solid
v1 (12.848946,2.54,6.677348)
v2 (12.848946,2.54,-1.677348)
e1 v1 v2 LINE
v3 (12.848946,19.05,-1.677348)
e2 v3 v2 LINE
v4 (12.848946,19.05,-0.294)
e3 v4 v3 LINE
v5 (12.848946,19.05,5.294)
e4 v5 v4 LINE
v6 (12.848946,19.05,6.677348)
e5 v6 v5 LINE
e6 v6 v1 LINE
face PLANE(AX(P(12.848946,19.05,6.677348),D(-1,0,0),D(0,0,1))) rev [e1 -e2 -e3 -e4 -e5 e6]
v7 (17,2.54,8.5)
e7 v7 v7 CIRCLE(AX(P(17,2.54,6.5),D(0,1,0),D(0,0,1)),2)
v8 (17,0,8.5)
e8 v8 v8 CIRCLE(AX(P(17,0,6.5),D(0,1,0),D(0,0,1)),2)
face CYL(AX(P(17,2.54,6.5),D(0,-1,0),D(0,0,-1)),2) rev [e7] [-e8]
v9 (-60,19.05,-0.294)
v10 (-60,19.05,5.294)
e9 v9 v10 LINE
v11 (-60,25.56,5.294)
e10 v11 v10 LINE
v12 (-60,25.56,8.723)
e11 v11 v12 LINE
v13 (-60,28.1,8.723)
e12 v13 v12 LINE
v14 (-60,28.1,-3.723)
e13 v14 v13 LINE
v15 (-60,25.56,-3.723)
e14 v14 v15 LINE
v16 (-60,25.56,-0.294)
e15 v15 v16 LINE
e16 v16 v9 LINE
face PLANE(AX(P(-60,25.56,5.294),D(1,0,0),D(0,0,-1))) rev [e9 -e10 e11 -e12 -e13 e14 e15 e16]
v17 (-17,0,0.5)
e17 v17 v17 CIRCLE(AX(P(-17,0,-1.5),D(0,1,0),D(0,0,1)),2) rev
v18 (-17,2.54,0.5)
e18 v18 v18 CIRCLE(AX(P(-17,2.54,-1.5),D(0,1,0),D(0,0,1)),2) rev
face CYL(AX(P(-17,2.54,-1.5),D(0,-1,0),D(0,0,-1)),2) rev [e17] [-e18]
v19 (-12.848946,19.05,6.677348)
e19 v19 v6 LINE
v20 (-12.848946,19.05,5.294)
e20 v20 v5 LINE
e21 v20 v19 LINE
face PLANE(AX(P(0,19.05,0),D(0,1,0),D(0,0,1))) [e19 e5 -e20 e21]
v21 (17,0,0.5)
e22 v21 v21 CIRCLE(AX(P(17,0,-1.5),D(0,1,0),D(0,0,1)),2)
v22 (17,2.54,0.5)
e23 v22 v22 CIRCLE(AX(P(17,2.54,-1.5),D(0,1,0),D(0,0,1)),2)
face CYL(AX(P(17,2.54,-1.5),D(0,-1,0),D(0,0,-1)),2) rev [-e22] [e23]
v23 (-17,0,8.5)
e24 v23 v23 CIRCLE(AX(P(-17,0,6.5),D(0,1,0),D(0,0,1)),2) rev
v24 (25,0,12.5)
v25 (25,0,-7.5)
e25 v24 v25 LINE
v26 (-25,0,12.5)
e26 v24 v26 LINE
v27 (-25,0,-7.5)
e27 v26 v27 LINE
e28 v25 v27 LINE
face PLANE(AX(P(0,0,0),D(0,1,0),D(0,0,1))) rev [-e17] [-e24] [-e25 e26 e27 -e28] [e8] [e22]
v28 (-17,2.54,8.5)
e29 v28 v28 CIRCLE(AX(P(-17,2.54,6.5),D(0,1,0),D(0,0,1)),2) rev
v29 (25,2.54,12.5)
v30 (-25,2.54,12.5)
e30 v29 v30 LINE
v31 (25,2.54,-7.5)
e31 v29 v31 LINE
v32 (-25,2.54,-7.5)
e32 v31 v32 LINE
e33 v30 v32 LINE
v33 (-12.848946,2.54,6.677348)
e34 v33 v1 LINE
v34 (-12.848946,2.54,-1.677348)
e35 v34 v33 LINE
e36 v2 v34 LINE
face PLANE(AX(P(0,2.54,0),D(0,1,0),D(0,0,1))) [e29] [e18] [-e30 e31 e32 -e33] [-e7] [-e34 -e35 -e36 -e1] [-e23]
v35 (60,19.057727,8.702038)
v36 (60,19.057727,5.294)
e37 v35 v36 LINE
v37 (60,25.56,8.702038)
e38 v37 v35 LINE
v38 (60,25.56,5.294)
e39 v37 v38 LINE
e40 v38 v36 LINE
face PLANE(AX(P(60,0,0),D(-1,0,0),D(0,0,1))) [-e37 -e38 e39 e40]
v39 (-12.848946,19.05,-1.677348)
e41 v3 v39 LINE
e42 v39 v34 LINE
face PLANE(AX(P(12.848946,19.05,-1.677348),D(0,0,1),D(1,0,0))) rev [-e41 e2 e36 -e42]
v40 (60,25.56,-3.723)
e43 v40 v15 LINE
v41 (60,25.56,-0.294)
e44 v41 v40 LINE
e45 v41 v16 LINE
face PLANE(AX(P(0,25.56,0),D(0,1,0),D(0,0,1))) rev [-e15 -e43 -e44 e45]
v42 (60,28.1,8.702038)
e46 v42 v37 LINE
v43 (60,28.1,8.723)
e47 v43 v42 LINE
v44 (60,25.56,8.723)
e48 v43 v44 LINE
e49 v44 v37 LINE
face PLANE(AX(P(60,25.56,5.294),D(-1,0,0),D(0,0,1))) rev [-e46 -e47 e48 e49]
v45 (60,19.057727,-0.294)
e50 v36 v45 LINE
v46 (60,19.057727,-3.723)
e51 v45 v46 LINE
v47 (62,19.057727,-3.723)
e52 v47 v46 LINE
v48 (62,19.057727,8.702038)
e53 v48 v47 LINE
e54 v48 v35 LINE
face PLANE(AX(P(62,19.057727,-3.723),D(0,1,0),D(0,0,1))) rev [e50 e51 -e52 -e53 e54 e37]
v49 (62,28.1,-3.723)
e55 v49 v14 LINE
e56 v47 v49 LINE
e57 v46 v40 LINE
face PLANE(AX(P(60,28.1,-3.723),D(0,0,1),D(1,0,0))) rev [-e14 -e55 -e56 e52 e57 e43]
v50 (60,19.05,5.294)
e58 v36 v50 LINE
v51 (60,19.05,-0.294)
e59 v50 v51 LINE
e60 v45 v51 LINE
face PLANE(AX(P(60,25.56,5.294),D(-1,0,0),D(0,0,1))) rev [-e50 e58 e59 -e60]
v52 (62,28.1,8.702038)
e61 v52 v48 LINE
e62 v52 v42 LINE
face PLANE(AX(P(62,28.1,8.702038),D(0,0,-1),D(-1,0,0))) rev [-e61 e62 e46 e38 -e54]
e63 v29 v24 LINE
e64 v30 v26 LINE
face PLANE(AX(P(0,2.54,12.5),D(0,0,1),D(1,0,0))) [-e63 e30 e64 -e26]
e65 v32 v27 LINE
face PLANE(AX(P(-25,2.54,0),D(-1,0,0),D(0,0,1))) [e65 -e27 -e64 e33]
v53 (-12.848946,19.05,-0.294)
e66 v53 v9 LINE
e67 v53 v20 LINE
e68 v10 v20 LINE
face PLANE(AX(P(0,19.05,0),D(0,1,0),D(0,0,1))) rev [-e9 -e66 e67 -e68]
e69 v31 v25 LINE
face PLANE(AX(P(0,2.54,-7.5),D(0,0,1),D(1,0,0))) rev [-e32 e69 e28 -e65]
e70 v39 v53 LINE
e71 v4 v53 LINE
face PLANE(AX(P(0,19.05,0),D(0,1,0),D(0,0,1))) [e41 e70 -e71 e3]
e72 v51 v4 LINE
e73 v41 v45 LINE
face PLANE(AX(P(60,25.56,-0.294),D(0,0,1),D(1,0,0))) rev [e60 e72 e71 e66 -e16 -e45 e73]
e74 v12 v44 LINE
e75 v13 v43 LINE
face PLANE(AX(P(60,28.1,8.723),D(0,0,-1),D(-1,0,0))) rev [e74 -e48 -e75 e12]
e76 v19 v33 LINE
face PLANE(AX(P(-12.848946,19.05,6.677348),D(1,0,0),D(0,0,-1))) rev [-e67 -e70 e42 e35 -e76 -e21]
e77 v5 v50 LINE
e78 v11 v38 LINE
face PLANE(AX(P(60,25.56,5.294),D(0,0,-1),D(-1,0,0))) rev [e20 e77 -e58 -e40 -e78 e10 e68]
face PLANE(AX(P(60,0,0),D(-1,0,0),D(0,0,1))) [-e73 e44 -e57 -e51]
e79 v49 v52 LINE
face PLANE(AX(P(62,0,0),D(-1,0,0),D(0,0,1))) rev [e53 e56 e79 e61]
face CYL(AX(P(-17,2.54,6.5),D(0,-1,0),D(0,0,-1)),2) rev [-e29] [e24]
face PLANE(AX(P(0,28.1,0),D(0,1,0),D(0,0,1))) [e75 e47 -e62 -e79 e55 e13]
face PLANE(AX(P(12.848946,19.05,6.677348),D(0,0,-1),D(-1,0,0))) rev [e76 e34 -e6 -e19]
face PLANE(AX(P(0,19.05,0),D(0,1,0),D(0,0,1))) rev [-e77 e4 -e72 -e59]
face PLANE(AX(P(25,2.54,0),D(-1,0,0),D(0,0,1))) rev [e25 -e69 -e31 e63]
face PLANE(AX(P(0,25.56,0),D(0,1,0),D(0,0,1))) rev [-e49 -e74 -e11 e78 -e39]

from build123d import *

# Parameters (mm, degrees)
SKETCH1_W           = 50
SKETCH1_H           = 20
SKETCH1_R           = 2
BOSS_EXTRUDE1_DEPTH = 2.54
SKETCH2_W           = 25.697892262
SKETCH2_H           = 8.354695914
BOSS_EXTRUDE2_DEPTH = 16.51
SKETCH3_W           = 120
SKETCH3_H           = 5.588
BOSS_EXTRUDE3_DEPTH = 6.51
SKETCH4_W           = 120
SKETCH4_H           = 12.446
BOSS_EXTRUDE4_DEPTH = 2.54
SKETCH6_W           = 12.425038184
SKETCH6_H           = 9.042273223
BOSS_EXTRUDE6_DEPTH = 2


with BuildPart() as part:
    # Sketch1 → Boss-Extrude1 (new body)
    with BuildSketch(Plane(origin=(0, 0, 0), x_dir=(1, 0, 0), z_dir=(0, 1, 0))):
        with Locations((0, -2.5)):
            Rectangle(SKETCH1_W, SKETCH1_H)
        with Locations((-17, -6.5)):
            Circle(SKETCH1_R, mode=Mode.SUBTRACT)
        with Locations((17, -6.5)):
            Circle(SKETCH1_R, mode=Mode.SUBTRACT)
        with Locations((-17, 1.5)):
            Circle(SKETCH1_R, mode=Mode.SUBTRACT)
        with Locations((17, 1.5)):
            Circle(SKETCH1_R, mode=Mode.SUBTRACT)
    extrude(amount=BOSS_EXTRUDE1_DEPTH)

    # Sketch2 → Boss-Extrude2 (add)
    with BuildSketch(Plane(origin=(0, 2.54, 0), x_dir=(1, 0, 0), z_dir=(0, 1, 0))):
        with Locations((0, -2.5)):
            Rectangle(SKETCH2_W, SKETCH2_H)
    extrude(amount=BOSS_EXTRUDE2_DEPTH)

    # Sketch3 → Boss-Extrude3 (add)
    with BuildSketch(Plane(origin=(0, 19.05, 0), x_dir=(1, 0, 0), z_dir=(0, 1, 0))):
        with Locations((0, -2.5)):
            Rectangle(SKETCH3_W, SKETCH3_H)
    extrude(amount=BOSS_EXTRUDE3_DEPTH)

    # Sketch4 → Boss-Extrude4 (add)
    with BuildSketch(Plane(origin=(0, 25.56, 0), x_dir=(1, 0, 0), z_dir=(0, 1, 0))):
        with Locations((0, -2.5)):
            Rectangle(SKETCH4_W, SKETCH4_H)
    extrude(amount=BOSS_EXTRUDE4_DEPTH)

    # Sketch6 → Boss-Extrude6 (add)
    with BuildSketch(Plane(origin=(60, 0, 0), x_dir=(0, 0, -1), z_dir=(1, 0, 0))):
        with Locations((-2.489519092, 23.578863389)):
            Rectangle(SKETCH6_W, SKETCH6_H)
    extrude(amount=BOSS_EXTRUDE6_DEPTH)


solid = part.part
